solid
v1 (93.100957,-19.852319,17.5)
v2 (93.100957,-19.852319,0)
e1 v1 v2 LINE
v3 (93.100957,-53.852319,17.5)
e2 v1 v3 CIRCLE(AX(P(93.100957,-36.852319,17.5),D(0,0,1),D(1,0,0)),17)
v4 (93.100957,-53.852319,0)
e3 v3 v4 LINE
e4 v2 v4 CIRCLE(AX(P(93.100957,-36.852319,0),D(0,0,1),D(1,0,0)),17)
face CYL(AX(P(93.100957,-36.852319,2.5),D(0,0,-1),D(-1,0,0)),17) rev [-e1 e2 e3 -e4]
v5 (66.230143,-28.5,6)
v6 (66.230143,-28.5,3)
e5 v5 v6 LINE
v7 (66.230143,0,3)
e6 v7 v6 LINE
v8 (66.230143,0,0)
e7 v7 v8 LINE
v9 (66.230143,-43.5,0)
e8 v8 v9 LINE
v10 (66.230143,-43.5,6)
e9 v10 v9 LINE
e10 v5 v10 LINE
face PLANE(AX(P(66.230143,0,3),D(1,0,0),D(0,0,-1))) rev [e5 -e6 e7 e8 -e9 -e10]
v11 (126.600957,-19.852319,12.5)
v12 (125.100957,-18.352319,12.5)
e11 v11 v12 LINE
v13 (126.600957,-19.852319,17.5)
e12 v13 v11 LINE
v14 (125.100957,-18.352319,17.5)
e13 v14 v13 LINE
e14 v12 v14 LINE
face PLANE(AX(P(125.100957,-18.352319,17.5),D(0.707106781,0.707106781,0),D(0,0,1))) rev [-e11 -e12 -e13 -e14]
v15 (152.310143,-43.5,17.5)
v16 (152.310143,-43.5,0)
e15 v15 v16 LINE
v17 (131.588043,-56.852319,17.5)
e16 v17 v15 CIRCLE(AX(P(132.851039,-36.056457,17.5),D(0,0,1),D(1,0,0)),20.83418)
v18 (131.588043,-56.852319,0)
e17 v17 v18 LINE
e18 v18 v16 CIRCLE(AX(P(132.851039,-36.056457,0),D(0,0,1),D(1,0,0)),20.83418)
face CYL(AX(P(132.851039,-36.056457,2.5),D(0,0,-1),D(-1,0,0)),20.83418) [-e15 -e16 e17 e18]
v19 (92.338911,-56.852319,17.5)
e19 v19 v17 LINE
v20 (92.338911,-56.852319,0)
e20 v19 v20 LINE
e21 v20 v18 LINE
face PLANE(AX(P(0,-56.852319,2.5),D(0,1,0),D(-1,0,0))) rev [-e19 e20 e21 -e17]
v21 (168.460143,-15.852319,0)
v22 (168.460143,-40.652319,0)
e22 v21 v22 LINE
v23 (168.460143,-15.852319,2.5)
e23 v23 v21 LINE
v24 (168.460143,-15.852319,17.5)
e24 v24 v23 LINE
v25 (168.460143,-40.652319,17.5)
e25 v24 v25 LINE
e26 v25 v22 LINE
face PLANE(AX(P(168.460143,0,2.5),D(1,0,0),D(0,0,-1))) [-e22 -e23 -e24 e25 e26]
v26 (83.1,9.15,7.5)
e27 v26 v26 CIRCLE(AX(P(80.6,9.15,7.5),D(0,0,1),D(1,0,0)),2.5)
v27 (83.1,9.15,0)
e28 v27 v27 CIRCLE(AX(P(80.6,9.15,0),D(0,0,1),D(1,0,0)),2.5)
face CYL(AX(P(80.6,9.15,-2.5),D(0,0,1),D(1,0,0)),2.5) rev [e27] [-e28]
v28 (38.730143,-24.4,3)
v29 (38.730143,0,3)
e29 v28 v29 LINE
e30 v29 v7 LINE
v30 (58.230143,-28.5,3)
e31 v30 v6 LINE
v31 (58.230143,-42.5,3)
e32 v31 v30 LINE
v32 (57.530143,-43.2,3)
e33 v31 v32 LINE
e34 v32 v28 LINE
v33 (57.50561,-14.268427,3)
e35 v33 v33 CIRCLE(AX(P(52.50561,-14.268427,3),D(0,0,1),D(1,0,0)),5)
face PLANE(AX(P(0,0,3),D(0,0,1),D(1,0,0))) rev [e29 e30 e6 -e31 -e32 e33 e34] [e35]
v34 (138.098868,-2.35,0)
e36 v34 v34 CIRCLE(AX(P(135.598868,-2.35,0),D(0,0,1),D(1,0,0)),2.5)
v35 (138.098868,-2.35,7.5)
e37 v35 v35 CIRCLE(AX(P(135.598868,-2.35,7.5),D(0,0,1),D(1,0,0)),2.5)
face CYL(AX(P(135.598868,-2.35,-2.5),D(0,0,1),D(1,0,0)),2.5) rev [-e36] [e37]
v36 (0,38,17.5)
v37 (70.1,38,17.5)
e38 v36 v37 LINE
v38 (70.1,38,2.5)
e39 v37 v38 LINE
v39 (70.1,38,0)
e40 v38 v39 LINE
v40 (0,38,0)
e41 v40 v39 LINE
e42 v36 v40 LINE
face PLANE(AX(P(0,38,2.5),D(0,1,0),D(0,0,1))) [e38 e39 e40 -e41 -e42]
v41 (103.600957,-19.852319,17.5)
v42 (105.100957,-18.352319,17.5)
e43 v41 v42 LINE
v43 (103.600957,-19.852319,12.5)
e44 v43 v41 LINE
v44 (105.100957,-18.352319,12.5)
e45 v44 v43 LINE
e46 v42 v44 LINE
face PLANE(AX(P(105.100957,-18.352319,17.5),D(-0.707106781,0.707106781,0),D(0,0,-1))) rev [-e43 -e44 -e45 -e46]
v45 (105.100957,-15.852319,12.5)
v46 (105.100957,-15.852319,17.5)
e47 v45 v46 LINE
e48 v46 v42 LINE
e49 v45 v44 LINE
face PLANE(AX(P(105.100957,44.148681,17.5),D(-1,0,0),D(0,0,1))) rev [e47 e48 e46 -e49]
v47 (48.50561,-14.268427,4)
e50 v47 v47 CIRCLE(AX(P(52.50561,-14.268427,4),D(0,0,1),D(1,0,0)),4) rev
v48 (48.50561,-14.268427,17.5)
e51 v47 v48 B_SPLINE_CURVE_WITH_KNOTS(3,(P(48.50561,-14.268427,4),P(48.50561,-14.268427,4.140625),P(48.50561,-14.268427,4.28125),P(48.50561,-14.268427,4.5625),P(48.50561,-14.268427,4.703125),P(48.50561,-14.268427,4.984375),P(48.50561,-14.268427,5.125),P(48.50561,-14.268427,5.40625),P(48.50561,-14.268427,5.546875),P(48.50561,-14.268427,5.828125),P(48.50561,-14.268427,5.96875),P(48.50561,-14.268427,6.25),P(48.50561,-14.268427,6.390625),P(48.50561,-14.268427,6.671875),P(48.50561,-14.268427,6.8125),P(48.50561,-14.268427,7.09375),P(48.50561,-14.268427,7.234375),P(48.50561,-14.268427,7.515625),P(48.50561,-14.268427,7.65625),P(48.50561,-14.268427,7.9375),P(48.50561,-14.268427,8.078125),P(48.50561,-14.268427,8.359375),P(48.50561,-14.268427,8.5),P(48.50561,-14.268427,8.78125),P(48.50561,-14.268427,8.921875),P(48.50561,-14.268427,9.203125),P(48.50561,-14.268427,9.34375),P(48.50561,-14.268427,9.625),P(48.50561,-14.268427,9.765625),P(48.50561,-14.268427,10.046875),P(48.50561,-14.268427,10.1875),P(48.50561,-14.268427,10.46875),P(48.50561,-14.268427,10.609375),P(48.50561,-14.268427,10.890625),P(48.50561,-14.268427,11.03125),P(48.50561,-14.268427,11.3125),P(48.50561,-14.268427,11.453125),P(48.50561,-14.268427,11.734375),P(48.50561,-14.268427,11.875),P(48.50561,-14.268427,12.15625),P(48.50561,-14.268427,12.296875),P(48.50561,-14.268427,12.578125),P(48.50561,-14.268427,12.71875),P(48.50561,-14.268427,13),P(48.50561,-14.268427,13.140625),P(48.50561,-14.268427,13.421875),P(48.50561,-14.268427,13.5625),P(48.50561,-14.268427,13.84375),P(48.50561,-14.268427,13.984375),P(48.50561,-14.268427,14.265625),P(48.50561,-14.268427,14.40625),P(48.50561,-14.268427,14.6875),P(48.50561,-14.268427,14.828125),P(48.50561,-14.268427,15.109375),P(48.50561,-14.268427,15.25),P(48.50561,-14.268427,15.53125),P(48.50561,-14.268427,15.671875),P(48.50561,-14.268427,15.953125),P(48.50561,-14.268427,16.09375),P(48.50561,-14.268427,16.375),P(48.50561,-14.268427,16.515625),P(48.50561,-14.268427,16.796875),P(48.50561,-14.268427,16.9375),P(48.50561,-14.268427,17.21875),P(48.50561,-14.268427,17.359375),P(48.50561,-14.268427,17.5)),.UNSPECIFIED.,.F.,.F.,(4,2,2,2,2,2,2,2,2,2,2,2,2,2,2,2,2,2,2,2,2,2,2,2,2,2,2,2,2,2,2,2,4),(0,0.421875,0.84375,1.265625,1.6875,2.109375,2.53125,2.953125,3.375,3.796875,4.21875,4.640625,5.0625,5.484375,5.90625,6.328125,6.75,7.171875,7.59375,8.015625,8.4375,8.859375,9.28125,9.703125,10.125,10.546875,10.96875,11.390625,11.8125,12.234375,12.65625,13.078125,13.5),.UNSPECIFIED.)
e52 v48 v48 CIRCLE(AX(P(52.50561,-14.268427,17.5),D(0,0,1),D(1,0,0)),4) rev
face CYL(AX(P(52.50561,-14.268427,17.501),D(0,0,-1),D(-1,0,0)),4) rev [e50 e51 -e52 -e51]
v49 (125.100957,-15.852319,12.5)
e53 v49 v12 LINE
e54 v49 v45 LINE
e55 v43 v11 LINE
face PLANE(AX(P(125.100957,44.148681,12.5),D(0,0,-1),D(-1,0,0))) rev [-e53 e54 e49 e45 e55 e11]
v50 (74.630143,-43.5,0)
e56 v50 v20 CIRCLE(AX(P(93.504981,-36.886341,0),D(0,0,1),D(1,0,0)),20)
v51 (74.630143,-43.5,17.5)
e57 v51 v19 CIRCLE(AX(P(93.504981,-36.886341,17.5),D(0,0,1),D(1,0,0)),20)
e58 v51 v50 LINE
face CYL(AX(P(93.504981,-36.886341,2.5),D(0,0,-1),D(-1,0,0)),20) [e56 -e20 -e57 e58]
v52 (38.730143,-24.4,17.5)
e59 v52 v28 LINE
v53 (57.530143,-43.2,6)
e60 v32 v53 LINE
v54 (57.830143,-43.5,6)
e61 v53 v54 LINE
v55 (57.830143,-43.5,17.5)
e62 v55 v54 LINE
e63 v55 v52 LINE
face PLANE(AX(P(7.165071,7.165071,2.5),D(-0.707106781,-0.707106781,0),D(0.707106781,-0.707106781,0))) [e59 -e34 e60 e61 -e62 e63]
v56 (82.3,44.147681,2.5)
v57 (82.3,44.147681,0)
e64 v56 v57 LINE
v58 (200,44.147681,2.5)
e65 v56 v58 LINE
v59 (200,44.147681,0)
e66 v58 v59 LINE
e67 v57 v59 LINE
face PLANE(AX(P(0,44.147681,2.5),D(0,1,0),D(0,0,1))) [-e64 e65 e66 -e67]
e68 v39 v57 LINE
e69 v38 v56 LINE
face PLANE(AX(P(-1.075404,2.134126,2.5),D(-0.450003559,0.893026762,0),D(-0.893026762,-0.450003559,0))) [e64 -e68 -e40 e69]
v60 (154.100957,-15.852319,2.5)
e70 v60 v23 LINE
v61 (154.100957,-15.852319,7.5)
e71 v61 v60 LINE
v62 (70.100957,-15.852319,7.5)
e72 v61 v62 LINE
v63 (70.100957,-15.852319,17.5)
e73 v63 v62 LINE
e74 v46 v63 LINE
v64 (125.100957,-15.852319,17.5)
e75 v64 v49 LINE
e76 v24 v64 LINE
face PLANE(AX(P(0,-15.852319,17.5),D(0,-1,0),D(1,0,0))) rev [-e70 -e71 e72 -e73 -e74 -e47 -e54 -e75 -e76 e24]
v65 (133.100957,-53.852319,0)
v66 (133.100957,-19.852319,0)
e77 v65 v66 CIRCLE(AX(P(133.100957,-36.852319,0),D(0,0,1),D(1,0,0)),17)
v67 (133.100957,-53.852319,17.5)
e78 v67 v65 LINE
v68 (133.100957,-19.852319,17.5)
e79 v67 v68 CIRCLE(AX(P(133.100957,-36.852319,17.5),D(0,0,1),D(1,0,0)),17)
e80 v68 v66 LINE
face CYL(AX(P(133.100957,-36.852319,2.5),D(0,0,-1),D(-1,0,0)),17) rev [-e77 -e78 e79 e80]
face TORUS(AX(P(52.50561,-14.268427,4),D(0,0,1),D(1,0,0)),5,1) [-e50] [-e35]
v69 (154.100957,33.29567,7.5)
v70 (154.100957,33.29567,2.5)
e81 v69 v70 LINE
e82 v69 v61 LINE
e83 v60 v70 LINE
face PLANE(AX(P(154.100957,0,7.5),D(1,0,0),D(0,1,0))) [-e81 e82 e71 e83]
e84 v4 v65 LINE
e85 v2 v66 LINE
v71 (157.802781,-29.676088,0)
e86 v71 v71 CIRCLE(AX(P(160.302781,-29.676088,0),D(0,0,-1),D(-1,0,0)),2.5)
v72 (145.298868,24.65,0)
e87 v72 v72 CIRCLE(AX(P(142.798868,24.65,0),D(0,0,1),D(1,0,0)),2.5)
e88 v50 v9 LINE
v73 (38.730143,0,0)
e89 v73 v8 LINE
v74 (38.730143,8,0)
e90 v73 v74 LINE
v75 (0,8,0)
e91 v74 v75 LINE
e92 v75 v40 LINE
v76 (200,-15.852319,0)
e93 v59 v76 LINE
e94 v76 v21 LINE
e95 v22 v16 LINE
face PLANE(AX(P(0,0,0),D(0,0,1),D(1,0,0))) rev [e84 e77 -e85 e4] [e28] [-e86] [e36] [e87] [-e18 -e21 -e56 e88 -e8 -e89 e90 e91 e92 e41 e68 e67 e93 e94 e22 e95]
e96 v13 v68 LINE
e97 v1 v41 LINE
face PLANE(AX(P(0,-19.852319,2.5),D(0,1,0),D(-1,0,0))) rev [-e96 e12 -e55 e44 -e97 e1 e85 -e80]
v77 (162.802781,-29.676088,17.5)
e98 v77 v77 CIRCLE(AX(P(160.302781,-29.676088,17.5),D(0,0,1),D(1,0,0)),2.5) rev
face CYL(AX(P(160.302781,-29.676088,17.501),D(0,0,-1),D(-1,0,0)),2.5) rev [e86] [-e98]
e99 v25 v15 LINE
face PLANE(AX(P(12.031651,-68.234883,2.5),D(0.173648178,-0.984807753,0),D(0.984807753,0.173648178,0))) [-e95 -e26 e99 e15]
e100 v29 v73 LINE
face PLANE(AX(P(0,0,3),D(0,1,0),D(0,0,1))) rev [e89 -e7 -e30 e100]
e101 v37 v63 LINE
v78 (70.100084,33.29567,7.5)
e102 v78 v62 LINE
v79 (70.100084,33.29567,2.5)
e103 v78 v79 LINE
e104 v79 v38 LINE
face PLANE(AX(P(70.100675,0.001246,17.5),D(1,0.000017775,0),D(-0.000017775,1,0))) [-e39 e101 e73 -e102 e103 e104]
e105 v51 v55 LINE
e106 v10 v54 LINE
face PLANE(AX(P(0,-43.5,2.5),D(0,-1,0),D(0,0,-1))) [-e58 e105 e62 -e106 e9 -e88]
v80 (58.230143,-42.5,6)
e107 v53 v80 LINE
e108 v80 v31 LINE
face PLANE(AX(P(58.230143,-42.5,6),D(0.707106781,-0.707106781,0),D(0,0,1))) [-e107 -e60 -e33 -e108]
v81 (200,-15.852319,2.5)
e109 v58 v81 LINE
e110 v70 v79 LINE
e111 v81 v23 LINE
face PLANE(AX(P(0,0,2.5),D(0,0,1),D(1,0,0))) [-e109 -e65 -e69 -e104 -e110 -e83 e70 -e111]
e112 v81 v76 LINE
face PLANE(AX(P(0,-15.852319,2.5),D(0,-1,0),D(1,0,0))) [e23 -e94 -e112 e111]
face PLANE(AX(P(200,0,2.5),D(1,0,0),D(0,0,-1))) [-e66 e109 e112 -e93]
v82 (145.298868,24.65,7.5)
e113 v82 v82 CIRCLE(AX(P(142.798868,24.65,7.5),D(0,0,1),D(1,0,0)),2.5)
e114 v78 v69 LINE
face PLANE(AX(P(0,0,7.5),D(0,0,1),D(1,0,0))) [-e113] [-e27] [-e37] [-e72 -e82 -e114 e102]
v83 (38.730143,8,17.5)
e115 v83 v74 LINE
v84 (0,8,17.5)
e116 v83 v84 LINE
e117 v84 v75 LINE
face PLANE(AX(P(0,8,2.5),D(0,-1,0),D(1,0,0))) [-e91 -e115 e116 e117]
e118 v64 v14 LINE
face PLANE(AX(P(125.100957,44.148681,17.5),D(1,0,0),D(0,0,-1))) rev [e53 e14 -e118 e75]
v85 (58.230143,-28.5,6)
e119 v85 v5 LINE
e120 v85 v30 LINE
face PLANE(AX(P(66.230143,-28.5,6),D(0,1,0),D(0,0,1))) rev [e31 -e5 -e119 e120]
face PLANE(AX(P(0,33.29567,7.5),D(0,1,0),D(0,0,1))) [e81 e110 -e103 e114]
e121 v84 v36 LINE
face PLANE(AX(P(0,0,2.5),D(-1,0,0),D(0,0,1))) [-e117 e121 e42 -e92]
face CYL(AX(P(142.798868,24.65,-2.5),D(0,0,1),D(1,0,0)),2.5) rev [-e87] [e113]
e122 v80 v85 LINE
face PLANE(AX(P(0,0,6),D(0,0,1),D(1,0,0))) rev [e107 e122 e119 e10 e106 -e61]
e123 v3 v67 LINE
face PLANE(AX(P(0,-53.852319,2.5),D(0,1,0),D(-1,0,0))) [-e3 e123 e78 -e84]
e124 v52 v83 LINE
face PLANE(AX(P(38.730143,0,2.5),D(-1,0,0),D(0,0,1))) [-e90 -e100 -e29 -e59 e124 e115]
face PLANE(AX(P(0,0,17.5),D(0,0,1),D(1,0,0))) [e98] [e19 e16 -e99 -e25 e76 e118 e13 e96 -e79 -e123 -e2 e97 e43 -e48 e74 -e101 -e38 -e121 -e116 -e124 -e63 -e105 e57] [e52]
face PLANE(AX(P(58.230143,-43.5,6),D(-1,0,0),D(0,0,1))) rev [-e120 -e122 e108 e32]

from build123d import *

# Parameters (mm, degrees)
EXTRUDE_1_DEPTH     = 2.5
EXTRUDE_2_DEPTH     = 17.5
CUT_EXTRUDE_2_REACH = 212.718
SKETCH_5_W          = 20
SKETCH_5_H          = 5
CHAMFER_1_SIZE      = 1.5
EXTRUDE_3_DEPTH     = 7.5
CUT_EXTRUDE_3_DEPTH = 3
SKETCH_13_R         = 2.5
CUT_EXTRUDE_4_DEPTH = 10
SKETCH_14_W         = 8
SKETCH_14_H         = 15
CUT_EXTRUDE_5_DEPTH = 3
CHAMFER_2_SIZE      = 1
CUT_EXTRUDE_6_REACH = 210.439
SKETCH_15_R         = 4
FILLET_1_R          = 1
CUT_EXTRUDE_7_REACH = 210.669
SKETCH_18_R         = 2.5


with BuildPart() as part:
    # 스케치2 → 보스-돌출1 (new body)
    with BuildSketch(Plane.XY):
        with BuildLine():
            Line((70.1, 38), (0, 38))
            Line((0, 38), (0, 8))
            Line((0, 8), (38.730142729, 8))
            Line((38.730142729, 8), (38.730142729, -24.4))
            Line((38.730142729, -24.4), (57.830142729, -43.5))
            Line((57.830142729, -43.5), (74.630142729, -43.5))
            ThreePointArc((74.630142729, -43.5), (81.464191763, -52.855667895), (92.338911336, -56.852319262))
            Line((92.338911336, -56.852319262), (131.588043415, -56.852319262))
            ThreePointArc((131.588043415, -56.852319262), (144.135794003, -53.569804808), (152.310142729, -43.5))
            Line((152.310142729, -43.5), (168.460142729, -40.652319262))
            Line((168.460142729, -40.652319262), (168.460142729, -15.852319262))
            Line((168.460142729, -15.852319262), (200, -15.852319262))
            Line((200, -15.852319262), (200, 44.147680738))
            Line((200, 44.147680738), (82.3, 44.147680738))
            Line((82.3, 44.147680738), (70.1, 38))
        make_face()
        with BuildLine():
            Line((93.10095722, -19.852319262), (133.10095722, -19.852319262))
            ThreePointArc((133.10095722, -19.852319262), (150.10095722, -36.852319262), (133.10095722, -53.852319262))
            Line((133.10095722, -53.852319262), (93.10095722, -53.852319262))
            ThreePointArc((93.10095722, -53.852319262), (76.10095722, -36.852319262), (93.10095722, -19.852319262))
        make_face(mode=Mode.SUBTRACT)
    extrude(amount=EXTRUDE_1_DEPTH)

    # 스케치2<3> → 보스-돌출2 (add)
    with BuildSketch(Plane.XY):
        with BuildLine():
            Line((70.1, 38), (0, 38))
            Line((0, 38), (0, 8))
            Line((0, 8), (38.730142729, 8))
            Line((38.730142729, 8), (38.730142729, -24.4))
            Line((38.730142729, -24.4), (57.830142729, -43.5))
            Line((57.830142729, -43.5), (74.630142729, -43.5))
            ThreePointArc((74.630142729, -43.5), (81.464191763, -52.855667895), (92.338911336, -56.852319262))
            Line((92.338911336, -56.852319262), (131.588043415, -56.852319262))
            ThreePointArc((131.588043415, -56.852319262), (144.135794003, -53.569804808), (152.310142729, -43.5))
            Line((152.310142729, -43.5), (168.460142729, -40.652319262))
            Line((168.460142729, -40.652319262), (168.460142729, -15.852319262))
            Line((168.460142729, -15.852319262), (70.10095722, -15.852319262))
            Line((70.10095722, -15.852319262), (70.1, 38))
        make_face()
        with BuildLine():
            Line((93.10095722, -19.852319262), (133.10095722, -19.852319262))
            ThreePointArc((133.10095722, -19.852319262), (150.10095722, -36.852319262), (133.10095722, -53.852319262))
            Line((133.10095722, -53.852319262), (93.10095722, -53.852319262))
            ThreePointArc((93.10095722, -53.852319262), (76.10095722, -36.852319262), (93.10095722, -19.852319262))
        make_face(mode=Mode.SUBTRACT)
    extrude(amount=EXTRUDE_2_DEPTH)

    # 스케치5 → 컷-돌출2 (cut, up to next)
    with BuildSketch(Plane.XZ.offset(19.852319262), mode=Mode.PRIVATE) as cut_extrude_2_sk1:
        with Locations((115.10095722, 15)):
            Rectangle(SKETCH_5_W, SKETCH_5_H)
    cut_extrude_2_tool1 = extrude(cut_extrude_2_sk1.sketch, amount=-CUT_EXTRUDE_2_REACH, mode=Mode.PRIVATE) & part.part
    add(cut_extrude_2_tool1.solids().sort_by_distance((115.100957, -19.852319, 15))[0], mode=Mode.SUBTRACT)

    # 모따기1
    chamfer_1_edges = [part.edges().sort_by_distance(p)[0] for p in [
        (125.10095722, -19.852319262, 15),
        (105.10095722, -19.852319262, 15),
    ]]
    chamfer(chamfer_1_edges, length=CHAMFER_1_SIZE)

    # 스케치2<4> → 보스-돌출3 (add)
    with BuildSketch(Plane.XY):
        Polygon((154.10095722, 33.295670157), (70.100083619, 33.295670157), (70.100462148, 12), (70.10095722, -15.852319262), (154.10095722, -15.852319262), align=None)
    extrude(amount=EXTRUDE_3_DEPTH)

    # 스케치2<5> → 컷-돌출3 (cut)
    with BuildSketch(Plane.XY):
        Polygon((66.230142729, 0), (38.730142729, 0), (38.730142729, -24.4), (57.830142729, -43.5), (66.230142729, -43.5), align=None)
    extrude(amount=CUT_EXTRUDE_3_DEPTH, mode=Mode.SUBTRACT)

    # 스케치13 → 컷-돌출4 (cut, symmetric)
    with BuildSketch(Plane.XY.offset(7.5)):
        with Locations((80.6, 9.15)):
            Circle(SKETCH_13_R)
        with Locations((135.59886794, -2.35)):
            Circle(SKETCH_13_R)
        with Locations((142.79886794, 24.65)):
            Circle(SKETCH_13_R)
    extrude(amount=CUT_EXTRUDE_4_DEPTH, both=True, mode=Mode.SUBTRACT)

    # 스케치14 → 컷-돌출5 (cut)
    with BuildSketch(Plane(origin=(0, 0, 3), x_dir=(-1, 0, 0), z_dir=(0, 0, -1))):
        with Locations((-62.230142729, -36)):
            Rectangle(SKETCH_14_W, SKETCH_14_H)
    extrude(amount=-CUT_EXTRUDE_5_DEPTH, mode=Mode.SUBTRACT)

    # 모따기2
    # the kernel refuses this chamfer: 1 mm, written as the material it takes off along each edge
    with BuildSketch(Plane(origin=(58.230142729, -43.5, 0.428317012), x_dir=(-0.9996219169112968, -0.027495876610589005, 0), z_dir=(0, 0, 1))) as chamfer_2_piece_1:
        Polygon((CHAMFER_2_SIZE * 0.999621916911, -CHAMFER_2_SIZE * 0.0274958766106), (-CHAMFER_2_SIZE * 0.0274958766106, -CHAMFER_2_SIZE * 0.999621916911), (0, 0), align=None)
    extrude(amount=5.571682988, mode=Mode.SUBTRACT)

    # 스케치15 → 컷-돌출6 (cut, up to next)
    with BuildSketch(Plane(origin=(0, 0, 3), x_dir=(-1, 0, 0), z_dir=(0, 0, -1)), mode=Mode.PRIVATE) as cut_extrude_6_sk1:
        with Locations((-52.505609521, -14.268427339)):
            Circle(SKETCH_15_R)
    cut_extrude_6_tool1 = extrude(cut_extrude_6_sk1.sketch, amount=-CUT_EXTRUDE_6_REACH, mode=Mode.PRIVATE) & part.part
    add(cut_extrude_6_tool1.solids().sort_by_distance((52.50561, -14.268427, 3))[0], mode=Mode.SUBTRACT)

    # 필렛1
    fillet_1_edges = [part.edges().sort_by_distance(p)[0] for p in [
        (56.505609521, -14.268427339, 3),
    ]]
    fillet(fillet_1_edges, radius=FILLET_1_R)

    # 스케치18 → 컷-돌출7 (cut, up to next)
    with BuildSketch(Plane(origin=(0, 0, 0), x_dir=(-1, 0, 0), z_dir=(0, 0, -1)), mode=Mode.PRIVATE) as cut_extrude_7_sk1:
        with Locations((-160.302780776, -29.676087823)):
            Circle(SKETCH_18_R)
    cut_extrude_7_tool1 = extrude(cut_extrude_7_sk1.sketch, amount=-CUT_EXTRUDE_7_REACH, mode=Mode.PRIVATE) & part.part
    add(cut_extrude_7_tool1.solids().sort_by_distance((160.302781, -29.676088, 0))[0], mode=Mode.SUBTRACT)


solid = part.part
